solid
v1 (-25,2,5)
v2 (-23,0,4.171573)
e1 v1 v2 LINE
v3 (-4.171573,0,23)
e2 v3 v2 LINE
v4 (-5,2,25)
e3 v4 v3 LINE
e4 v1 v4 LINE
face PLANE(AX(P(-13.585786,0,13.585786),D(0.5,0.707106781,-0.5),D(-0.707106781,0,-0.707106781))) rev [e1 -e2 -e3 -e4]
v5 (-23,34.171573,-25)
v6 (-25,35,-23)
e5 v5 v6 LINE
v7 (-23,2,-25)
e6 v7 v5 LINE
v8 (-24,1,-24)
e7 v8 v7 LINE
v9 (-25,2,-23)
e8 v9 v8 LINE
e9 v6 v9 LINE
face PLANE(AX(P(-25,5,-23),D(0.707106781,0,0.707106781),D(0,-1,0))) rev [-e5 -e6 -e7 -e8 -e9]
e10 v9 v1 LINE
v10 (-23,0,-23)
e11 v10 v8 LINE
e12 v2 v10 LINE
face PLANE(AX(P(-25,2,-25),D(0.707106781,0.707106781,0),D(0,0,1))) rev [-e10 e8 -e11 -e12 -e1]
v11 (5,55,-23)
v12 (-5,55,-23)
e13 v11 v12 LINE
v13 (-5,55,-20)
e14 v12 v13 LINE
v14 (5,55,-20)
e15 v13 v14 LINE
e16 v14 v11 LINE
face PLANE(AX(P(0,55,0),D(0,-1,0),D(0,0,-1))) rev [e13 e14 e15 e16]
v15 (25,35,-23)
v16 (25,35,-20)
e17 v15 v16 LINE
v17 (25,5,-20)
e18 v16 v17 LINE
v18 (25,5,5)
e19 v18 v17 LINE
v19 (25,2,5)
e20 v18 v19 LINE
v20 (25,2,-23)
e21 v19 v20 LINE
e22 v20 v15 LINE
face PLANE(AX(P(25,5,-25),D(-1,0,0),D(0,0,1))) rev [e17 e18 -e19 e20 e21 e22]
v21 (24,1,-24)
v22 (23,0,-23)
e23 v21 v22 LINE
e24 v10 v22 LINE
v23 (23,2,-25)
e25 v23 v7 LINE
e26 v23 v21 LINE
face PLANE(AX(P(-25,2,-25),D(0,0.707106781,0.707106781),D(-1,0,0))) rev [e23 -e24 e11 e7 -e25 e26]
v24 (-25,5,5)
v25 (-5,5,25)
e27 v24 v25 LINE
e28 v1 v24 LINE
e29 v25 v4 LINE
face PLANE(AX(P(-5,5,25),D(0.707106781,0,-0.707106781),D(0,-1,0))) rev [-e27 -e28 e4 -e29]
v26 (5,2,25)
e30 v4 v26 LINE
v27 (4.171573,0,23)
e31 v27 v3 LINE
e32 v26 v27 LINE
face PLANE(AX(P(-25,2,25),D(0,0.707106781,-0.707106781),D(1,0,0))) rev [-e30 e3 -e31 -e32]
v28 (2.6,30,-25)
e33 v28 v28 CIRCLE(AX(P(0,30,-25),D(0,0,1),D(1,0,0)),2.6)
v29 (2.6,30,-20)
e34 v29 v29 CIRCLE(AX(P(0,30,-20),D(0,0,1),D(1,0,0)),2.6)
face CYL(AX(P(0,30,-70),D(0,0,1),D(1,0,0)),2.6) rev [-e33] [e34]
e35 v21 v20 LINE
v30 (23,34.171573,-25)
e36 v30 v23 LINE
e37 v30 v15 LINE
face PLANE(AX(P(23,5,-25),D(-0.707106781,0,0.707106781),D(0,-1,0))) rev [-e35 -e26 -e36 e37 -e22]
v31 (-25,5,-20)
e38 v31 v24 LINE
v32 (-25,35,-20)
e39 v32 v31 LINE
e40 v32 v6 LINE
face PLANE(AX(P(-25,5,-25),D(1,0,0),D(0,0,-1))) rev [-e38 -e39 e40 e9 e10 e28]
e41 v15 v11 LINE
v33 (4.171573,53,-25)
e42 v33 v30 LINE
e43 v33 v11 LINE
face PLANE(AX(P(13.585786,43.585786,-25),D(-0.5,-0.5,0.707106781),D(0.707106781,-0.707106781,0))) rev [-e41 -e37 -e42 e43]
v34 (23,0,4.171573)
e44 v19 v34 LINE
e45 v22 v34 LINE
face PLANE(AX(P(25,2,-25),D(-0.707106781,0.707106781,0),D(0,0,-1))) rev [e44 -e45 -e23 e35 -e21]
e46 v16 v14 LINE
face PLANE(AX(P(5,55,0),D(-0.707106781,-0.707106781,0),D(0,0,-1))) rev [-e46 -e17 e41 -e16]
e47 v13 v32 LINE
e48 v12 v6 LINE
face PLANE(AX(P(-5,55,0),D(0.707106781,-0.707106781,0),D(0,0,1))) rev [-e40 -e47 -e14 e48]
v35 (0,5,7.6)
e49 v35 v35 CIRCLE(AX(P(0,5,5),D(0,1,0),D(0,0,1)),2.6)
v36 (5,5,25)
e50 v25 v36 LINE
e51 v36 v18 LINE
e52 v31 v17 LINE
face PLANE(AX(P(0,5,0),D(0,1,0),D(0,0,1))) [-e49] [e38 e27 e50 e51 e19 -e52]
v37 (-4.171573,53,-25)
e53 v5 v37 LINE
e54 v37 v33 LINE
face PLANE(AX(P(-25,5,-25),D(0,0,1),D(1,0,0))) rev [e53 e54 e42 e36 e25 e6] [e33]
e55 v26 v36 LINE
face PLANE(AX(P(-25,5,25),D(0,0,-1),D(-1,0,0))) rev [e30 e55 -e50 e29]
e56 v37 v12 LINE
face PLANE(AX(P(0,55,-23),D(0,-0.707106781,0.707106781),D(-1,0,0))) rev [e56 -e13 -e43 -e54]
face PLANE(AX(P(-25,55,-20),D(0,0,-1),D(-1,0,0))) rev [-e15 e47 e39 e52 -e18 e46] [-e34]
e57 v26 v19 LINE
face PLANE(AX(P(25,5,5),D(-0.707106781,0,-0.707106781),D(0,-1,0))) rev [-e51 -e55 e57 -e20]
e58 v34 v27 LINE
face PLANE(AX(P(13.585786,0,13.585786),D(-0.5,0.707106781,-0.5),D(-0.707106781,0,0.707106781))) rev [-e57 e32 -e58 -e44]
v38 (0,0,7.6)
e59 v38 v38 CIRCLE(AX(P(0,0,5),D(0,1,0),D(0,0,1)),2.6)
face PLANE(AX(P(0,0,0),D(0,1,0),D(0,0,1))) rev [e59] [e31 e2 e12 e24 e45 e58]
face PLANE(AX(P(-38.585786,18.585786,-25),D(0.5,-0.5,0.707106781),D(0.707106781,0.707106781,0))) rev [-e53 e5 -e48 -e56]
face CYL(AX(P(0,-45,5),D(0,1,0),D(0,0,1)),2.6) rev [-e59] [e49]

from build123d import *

# Parameters (mm, degrees)
SKETCH1_W           = 50
SKETCH1_H           = 50
BOSS_EXTRUDE1_DEPTH = 5
SKETCH2_W           = 50
SKETCH2_H           = 5
BOSS_EXTRUDE2_DEPTH = 50
SKETCH3_R           = 2.6
CUT_EXTRUDE1_DEPTH  = 50
CHAMFER1_SIZE       = 20
SKETCH4_R           = 2.6
CUT_EXTRUDE2_DEPTH  = 50
CHAMFER2_SIZE       = 20
CHAMFER3_SIZE       = 2
CHAMFER4_SIZE       = 2


with BuildPart() as part:
    # Sketch1 → Boss-Extrude1 (new body)
    with BuildSketch(Plane(origin=(0, 0, 0), x_dir=(1, 0, 0), z_dir=(0, 1, 0))):
        Rectangle(SKETCH1_W, SKETCH1_H)
    extrude(amount=BOSS_EXTRUDE1_DEPTH)

    # Sketch2 → Boss-Extrude2 (add)
    with BuildSketch(Plane(origin=(0, 5, 0), x_dir=(1, 0, 0), z_dir=(0, 1, 0))):
        with Locations((0, 22.5)):
            Rectangle(SKETCH2_W, SKETCH2_H)
    extrude(amount=BOSS_EXTRUDE2_DEPTH)

    # Sketch3 → Cut-Extrude1 (cut)
    with BuildSketch(Plane.XY.offset(-20)):
        with Locations((0, 30)):
            Circle(SKETCH3_R)
    extrude(amount=-CUT_EXTRUDE1_DEPTH, mode=Mode.SUBTRACT)

    # Chamfer1
    chamfer1_edges = [part.edges().sort_by_distance(p)[0] for p in [
        (25, 55, -22.5),
        (-25, 55, -22.5),
    ]]
    chamfer(chamfer1_edges, length=CHAMFER1_SIZE)

    # Sketch4 → Cut-Extrude2 (cut)
    with BuildSketch(Plane(origin=(0, 5, 0), x_dir=(1, 0, 0), z_dir=(0, 1, 0))):
        with Locations(Location((0, -5, 0), (0, 0, 270))):
            Circle(SKETCH4_R)
    extrude(amount=-CUT_EXTRUDE2_DEPTH, mode=Mode.SUBTRACT)

    # Chamfer2
    chamfer2_edges = [part.edges().sort_by_distance(p)[0] for p in [
        (25, 2.5, 25),
        (-25, 2.5, 25),
    ]]
    chamfer(chamfer2_edges, length=CHAMFER2_SIZE)

    # Chamfer3
    chamfer3_edges = [part.edges().sort_by_distance(p)[0] for p in [
        (0, 0, -25),
    ]]
    chamfer(chamfer3_edges, length=CHAMFER3_SIZE)

    # Chamfer4
    # the kernel refuses this chamfer: 2 mm, written as the material it takes off along each edge
    with BuildSketch(Plane(origin=(25, 0, -28.143365976), x_dir=(-0.9996219169112968, -0.02749587661058639, 0), z_dir=(0, 0, 1))) as chamfer4_piece_1:
        Polygon((CHAMFER4_SIZE * 0.999621916911, -CHAMFER4_SIZE * 0.0274958766106), (-CHAMFER4_SIZE * 0.0274958766106, -CHAMFER4_SIZE * 0.999621916911), (0, 0), align=None)
    extrude(amount=38.286731952, mode=Mode.SUBTRACT)
    with BuildSketch(Plane(origin=(28.63690896, 0, 1.36309104), x_dir=(-0.7068394360706735, -0.027495876610586382, -0.7068394360706735), z_dir=(-0.7071067811865475, 0, 0.7071067811865476)), Plane(origin=(1.36309104, 58.63690896, -25), x_dir=(-0.7068394360706736, -0.7068394360706737, -0.027495876610585657), z_dir=(0.7071067811865476, -0.7071067811865476, 0)), Plane(origin=(-28.63690896, 31.36309104, -25), x_dir=(0.7068394360706735, -0.7068394360706735, -0.02749587661058563), z_dir=(0.7071067811865476, 0.7071067811865476, 0))) as chamfer4_piece_2:
        Polygon((CHAMFER4_SIZE * 0.999621916911, -CHAMFER4_SIZE * 0.0274958766106), (-CHAMFER4_SIZE * 0.0274958766106, -CHAMFER4_SIZE * 0.999621916911), (0, 0), align=None)
    extrude(amount=38.571003199, mode=Mode.SUBTRACT)
    with BuildSketch(Plane(origin=(10.143365976, 0, 25), x_dir=(0, -0.02749587661058639, -0.9996219169112968), z_dir=(-1, 0, 0))) as chamfer4_piece_3:
        Polygon((CHAMFER4_SIZE * 0.999621916911, -CHAMFER4_SIZE * 0.0274958766106), (-CHAMFER4_SIZE * 0.0274958766106, -CHAMFER4_SIZE * 0.999621916911), (0, 0), align=None)
    extrude(amount=20.286731952, mode=Mode.SUBTRACT)
    with BuildSketch(Plane(origin=(-28.63690896, 0, 1.36309104), x_dir=(0.7068394360706733, -0.027495876610586358, -0.7068394360706735), z_dir=(0.7071067811865476, 0, 0.7071067811865475))) as chamfer4_piece_4:
        Polygon((CHAMFER4_SIZE * 0.999621916911, CHAMFER4_SIZE * 0.0274958766106), (-CHAMFER4_SIZE * 0.0274958766106, CHAMFER4_SIZE * 0.999621916911), (0, 0), align=None)
    extrude(amount=38.571003199, mode=Mode.SUBTRACT)
    with BuildSketch(Plane(origin=(-25, 0, 10.143365976), x_dir=(-0.02749587661058563, 0.9996219169112968, 0), z_dir=(0, 0, -1))) as chamfer4_piece_5:
        Polygon((CHAMFER4_SIZE * 0.999621916911, CHAMFER4_SIZE * 0.0274958766106), (-CHAMFER4_SIZE * 0.0274958766106, CHAMFER4_SIZE * 0.999621916911), (0, 0), align=None)
    extrude(amount=38.286731952, mode=Mode.SUBTRACT)
    with BuildSketch(Plane(origin=(25, 40.143365976, -25), x_dir=(-0.9996219169112968, 0, -0.027495876610585647), z_dir=(0, -1, 0))) as chamfer4_piece_6:
        Polygon((CHAMFER4_SIZE * 0.999621916911, -CHAMFER4_SIZE * 0.0274958766106), (-CHAMFER4_SIZE * 0.0274958766106, -CHAMFER4_SIZE * 0.999621916911), (0, 0), align=None)
    extrude(amount=43.286731952, mode=Mode.SUBTRACT)
    with BuildSketch(Plane(origin=(10.143365976, 55, -25), x_dir=(0, -0.9996219169112968, -0.027495876610585647), z_dir=(-1, 0, 0))) as chamfer4_piece_7:
        Polygon((CHAMFER4_SIZE * 0.999621916911, CHAMFER4_SIZE * 0.0274958766106), (-CHAMFER4_SIZE * 0.0274958766106, CHAMFER4_SIZE * 0.999621916911), (0, 0), align=None)
    extrude(amount=20.286731952, mode=Mode.SUBTRACT)
    with BuildSketch(Plane(origin=(-25, -3.143365976, -25), x_dir=(-0.027495876610585647, 0, 0.9996219169112968), z_dir=(0, 1, 0))) as chamfer4_piece_8:
        Polygon((CHAMFER4_SIZE * 0.999621916911, CHAMFER4_SIZE * 0.0274958766106), (-CHAMFER4_SIZE * 0.0274958766106, CHAMFER4_SIZE * 0.999621916911), (0, 0), align=None)
    extrude(amount=43.286731952, mode=Mode.SUBTRACT)


solid = part.part
